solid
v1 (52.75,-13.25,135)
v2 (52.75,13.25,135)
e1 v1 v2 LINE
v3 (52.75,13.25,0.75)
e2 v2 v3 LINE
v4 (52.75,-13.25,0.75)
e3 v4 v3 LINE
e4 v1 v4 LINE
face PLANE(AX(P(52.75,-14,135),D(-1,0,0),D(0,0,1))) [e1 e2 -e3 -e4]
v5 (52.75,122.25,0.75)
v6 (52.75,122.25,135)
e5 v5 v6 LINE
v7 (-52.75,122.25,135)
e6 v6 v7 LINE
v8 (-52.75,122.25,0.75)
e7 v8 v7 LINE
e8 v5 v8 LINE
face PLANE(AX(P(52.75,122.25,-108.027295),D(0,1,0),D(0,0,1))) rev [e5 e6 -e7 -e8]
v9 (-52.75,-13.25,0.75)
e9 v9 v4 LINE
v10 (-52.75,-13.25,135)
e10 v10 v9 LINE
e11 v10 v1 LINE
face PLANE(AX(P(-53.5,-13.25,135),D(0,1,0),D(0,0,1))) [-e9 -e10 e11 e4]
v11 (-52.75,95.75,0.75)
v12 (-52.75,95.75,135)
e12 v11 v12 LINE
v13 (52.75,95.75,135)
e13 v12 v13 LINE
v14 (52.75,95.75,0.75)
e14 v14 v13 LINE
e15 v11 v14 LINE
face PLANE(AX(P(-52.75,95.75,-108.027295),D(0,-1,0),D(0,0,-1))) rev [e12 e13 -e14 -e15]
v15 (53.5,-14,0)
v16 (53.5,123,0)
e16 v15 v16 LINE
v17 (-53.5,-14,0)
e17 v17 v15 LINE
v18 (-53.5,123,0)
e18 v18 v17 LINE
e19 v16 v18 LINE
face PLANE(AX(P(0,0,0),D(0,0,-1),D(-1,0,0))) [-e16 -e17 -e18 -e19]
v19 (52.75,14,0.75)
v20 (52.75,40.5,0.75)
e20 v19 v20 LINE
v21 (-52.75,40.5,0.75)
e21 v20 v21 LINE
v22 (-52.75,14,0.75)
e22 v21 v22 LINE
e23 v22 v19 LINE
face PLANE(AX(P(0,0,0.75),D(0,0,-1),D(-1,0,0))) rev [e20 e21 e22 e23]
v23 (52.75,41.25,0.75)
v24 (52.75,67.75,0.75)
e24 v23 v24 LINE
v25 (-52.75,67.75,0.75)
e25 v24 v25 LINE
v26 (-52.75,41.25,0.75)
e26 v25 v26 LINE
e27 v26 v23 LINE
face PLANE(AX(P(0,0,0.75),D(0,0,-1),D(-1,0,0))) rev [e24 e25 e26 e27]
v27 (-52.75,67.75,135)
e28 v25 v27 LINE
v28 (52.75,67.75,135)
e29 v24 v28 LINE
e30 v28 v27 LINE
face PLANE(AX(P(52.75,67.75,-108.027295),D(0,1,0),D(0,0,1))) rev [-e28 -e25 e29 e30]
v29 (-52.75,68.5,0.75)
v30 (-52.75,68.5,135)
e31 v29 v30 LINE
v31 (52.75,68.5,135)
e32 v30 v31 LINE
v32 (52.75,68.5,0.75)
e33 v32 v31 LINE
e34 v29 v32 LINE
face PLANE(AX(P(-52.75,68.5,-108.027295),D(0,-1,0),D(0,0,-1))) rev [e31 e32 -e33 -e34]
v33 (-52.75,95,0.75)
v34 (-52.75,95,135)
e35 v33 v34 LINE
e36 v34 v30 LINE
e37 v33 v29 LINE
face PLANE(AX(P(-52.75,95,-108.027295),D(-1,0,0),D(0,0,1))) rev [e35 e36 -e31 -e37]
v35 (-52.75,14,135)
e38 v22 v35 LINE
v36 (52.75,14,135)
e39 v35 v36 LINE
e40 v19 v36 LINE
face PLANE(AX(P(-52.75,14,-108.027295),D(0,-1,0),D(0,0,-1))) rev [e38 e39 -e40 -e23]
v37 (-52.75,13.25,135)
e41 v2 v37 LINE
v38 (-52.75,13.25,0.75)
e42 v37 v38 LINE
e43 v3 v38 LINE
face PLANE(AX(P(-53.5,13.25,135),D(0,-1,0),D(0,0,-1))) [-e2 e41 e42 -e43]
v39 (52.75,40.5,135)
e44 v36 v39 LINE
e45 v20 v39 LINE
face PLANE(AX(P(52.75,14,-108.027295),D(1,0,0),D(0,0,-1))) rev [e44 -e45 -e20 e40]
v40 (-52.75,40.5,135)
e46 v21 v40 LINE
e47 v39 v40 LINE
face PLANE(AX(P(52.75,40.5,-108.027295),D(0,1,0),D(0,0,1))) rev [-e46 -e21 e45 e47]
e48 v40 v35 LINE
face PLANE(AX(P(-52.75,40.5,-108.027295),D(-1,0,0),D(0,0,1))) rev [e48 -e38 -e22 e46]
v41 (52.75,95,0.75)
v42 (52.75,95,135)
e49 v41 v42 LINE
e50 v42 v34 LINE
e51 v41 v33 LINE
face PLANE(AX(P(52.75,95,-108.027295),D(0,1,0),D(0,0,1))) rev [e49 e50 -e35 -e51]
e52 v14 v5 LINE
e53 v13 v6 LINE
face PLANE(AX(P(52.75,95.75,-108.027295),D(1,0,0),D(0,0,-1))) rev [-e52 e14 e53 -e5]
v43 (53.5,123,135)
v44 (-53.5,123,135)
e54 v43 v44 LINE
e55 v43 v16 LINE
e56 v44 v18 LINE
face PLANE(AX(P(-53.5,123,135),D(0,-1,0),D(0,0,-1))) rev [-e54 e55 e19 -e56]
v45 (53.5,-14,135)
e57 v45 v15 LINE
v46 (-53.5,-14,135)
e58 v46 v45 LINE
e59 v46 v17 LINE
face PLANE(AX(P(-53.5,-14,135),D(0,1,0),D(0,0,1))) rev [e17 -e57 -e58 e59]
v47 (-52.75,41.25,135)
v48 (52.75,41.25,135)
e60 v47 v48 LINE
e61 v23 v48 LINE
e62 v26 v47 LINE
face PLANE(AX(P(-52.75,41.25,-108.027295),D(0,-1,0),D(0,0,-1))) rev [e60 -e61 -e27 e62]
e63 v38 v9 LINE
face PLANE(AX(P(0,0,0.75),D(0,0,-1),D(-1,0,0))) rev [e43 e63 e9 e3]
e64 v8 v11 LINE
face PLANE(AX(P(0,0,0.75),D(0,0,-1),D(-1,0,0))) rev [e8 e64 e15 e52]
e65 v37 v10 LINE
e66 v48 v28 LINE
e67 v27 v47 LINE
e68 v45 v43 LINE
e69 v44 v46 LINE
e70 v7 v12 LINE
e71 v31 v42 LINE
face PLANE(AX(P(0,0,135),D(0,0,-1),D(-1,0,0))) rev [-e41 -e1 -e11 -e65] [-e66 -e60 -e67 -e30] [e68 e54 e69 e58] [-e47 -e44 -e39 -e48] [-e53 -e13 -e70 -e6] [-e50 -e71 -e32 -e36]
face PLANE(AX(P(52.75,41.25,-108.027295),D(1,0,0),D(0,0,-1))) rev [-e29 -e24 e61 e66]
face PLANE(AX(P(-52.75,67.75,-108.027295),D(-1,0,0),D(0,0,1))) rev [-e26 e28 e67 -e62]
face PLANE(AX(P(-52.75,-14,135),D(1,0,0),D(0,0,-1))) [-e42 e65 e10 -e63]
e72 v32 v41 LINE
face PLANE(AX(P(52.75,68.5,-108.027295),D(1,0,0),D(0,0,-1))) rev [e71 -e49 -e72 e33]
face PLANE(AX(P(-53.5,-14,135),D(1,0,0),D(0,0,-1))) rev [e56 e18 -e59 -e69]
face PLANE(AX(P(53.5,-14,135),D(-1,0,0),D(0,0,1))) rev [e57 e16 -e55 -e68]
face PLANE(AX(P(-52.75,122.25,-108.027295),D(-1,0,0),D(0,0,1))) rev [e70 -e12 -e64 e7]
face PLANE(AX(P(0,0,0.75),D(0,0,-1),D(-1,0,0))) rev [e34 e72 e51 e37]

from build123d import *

# Parameters (mm, degrees)
ESBO_O1_W                = 107
ESBO_O1_H                = 28
RESSALTO_EXTRUS_O1_DEPTH = 135
CASCA1_T                 = -0.75
PADR_O_LINEAR1_OUTLINE_W = 107
PADR_O_LINEAR1_OUTLINE_H = 109
PADR_O_LINEAR1_DEPTH     = 135
ESBO_O2_W                = 105.5
ESBO_O2_H                = 26.5
CORTE_EXTRUS_O1_DEPTH    = 134.25


# Read off the part's stored shape, not the designer's step: Padrão linear1
with BuildPart() as part:
    # Esboço1 → Ressalto-extrusão1 (new body)
    with BuildSketch(Plane.XY):
        Rectangle(ESBO_O1_W, ESBO_O1_H)
    extrude(amount=RESSALTO_EXTRUS_O1_DEPTH)

    # Casca1
    casca1_openings = [part.faces().sort_by_distance(p)[0] for p in [
        (0, 0, 135),
    ]]
    offset(amount=CASCA1_T, openings=casca1_openings, kind=Kind.INTERSECTION)

    # Padrão linear1 outline → Padrão linear1 (add)
    with BuildSketch(Plane.XY):
        with Locations((0, 68.5)):
            Rectangle(PADR_O_LINEAR1_OUTLINE_W, PADR_O_LINEAR1_OUTLINE_H)
    extrude(amount=PADR_O_LINEAR1_DEPTH)

    # Esboço2 → Corte-extrusão1 (cut)
    with BuildSketch(Plane.XY.offset(135)):
        Rectangle(ESBO_O2_W, ESBO_O2_H)
        with Locations((0, 27.25)):
            Rectangle(ESBO_O2_W, ESBO_O2_H)
        with Locations((0, 54.5)):
            Rectangle(ESBO_O2_W, ESBO_O2_H)
        with Locations((0, 81.75)):
            Rectangle(ESBO_O2_W, ESBO_O2_H)
        with Locations((0, 109)):
            Rectangle(ESBO_O2_W, ESBO_O2_H)
    extrude(amount=-CORTE_EXTRUS_O1_DEPTH, mode=Mode.SUBTRACT)


solid = part.part
